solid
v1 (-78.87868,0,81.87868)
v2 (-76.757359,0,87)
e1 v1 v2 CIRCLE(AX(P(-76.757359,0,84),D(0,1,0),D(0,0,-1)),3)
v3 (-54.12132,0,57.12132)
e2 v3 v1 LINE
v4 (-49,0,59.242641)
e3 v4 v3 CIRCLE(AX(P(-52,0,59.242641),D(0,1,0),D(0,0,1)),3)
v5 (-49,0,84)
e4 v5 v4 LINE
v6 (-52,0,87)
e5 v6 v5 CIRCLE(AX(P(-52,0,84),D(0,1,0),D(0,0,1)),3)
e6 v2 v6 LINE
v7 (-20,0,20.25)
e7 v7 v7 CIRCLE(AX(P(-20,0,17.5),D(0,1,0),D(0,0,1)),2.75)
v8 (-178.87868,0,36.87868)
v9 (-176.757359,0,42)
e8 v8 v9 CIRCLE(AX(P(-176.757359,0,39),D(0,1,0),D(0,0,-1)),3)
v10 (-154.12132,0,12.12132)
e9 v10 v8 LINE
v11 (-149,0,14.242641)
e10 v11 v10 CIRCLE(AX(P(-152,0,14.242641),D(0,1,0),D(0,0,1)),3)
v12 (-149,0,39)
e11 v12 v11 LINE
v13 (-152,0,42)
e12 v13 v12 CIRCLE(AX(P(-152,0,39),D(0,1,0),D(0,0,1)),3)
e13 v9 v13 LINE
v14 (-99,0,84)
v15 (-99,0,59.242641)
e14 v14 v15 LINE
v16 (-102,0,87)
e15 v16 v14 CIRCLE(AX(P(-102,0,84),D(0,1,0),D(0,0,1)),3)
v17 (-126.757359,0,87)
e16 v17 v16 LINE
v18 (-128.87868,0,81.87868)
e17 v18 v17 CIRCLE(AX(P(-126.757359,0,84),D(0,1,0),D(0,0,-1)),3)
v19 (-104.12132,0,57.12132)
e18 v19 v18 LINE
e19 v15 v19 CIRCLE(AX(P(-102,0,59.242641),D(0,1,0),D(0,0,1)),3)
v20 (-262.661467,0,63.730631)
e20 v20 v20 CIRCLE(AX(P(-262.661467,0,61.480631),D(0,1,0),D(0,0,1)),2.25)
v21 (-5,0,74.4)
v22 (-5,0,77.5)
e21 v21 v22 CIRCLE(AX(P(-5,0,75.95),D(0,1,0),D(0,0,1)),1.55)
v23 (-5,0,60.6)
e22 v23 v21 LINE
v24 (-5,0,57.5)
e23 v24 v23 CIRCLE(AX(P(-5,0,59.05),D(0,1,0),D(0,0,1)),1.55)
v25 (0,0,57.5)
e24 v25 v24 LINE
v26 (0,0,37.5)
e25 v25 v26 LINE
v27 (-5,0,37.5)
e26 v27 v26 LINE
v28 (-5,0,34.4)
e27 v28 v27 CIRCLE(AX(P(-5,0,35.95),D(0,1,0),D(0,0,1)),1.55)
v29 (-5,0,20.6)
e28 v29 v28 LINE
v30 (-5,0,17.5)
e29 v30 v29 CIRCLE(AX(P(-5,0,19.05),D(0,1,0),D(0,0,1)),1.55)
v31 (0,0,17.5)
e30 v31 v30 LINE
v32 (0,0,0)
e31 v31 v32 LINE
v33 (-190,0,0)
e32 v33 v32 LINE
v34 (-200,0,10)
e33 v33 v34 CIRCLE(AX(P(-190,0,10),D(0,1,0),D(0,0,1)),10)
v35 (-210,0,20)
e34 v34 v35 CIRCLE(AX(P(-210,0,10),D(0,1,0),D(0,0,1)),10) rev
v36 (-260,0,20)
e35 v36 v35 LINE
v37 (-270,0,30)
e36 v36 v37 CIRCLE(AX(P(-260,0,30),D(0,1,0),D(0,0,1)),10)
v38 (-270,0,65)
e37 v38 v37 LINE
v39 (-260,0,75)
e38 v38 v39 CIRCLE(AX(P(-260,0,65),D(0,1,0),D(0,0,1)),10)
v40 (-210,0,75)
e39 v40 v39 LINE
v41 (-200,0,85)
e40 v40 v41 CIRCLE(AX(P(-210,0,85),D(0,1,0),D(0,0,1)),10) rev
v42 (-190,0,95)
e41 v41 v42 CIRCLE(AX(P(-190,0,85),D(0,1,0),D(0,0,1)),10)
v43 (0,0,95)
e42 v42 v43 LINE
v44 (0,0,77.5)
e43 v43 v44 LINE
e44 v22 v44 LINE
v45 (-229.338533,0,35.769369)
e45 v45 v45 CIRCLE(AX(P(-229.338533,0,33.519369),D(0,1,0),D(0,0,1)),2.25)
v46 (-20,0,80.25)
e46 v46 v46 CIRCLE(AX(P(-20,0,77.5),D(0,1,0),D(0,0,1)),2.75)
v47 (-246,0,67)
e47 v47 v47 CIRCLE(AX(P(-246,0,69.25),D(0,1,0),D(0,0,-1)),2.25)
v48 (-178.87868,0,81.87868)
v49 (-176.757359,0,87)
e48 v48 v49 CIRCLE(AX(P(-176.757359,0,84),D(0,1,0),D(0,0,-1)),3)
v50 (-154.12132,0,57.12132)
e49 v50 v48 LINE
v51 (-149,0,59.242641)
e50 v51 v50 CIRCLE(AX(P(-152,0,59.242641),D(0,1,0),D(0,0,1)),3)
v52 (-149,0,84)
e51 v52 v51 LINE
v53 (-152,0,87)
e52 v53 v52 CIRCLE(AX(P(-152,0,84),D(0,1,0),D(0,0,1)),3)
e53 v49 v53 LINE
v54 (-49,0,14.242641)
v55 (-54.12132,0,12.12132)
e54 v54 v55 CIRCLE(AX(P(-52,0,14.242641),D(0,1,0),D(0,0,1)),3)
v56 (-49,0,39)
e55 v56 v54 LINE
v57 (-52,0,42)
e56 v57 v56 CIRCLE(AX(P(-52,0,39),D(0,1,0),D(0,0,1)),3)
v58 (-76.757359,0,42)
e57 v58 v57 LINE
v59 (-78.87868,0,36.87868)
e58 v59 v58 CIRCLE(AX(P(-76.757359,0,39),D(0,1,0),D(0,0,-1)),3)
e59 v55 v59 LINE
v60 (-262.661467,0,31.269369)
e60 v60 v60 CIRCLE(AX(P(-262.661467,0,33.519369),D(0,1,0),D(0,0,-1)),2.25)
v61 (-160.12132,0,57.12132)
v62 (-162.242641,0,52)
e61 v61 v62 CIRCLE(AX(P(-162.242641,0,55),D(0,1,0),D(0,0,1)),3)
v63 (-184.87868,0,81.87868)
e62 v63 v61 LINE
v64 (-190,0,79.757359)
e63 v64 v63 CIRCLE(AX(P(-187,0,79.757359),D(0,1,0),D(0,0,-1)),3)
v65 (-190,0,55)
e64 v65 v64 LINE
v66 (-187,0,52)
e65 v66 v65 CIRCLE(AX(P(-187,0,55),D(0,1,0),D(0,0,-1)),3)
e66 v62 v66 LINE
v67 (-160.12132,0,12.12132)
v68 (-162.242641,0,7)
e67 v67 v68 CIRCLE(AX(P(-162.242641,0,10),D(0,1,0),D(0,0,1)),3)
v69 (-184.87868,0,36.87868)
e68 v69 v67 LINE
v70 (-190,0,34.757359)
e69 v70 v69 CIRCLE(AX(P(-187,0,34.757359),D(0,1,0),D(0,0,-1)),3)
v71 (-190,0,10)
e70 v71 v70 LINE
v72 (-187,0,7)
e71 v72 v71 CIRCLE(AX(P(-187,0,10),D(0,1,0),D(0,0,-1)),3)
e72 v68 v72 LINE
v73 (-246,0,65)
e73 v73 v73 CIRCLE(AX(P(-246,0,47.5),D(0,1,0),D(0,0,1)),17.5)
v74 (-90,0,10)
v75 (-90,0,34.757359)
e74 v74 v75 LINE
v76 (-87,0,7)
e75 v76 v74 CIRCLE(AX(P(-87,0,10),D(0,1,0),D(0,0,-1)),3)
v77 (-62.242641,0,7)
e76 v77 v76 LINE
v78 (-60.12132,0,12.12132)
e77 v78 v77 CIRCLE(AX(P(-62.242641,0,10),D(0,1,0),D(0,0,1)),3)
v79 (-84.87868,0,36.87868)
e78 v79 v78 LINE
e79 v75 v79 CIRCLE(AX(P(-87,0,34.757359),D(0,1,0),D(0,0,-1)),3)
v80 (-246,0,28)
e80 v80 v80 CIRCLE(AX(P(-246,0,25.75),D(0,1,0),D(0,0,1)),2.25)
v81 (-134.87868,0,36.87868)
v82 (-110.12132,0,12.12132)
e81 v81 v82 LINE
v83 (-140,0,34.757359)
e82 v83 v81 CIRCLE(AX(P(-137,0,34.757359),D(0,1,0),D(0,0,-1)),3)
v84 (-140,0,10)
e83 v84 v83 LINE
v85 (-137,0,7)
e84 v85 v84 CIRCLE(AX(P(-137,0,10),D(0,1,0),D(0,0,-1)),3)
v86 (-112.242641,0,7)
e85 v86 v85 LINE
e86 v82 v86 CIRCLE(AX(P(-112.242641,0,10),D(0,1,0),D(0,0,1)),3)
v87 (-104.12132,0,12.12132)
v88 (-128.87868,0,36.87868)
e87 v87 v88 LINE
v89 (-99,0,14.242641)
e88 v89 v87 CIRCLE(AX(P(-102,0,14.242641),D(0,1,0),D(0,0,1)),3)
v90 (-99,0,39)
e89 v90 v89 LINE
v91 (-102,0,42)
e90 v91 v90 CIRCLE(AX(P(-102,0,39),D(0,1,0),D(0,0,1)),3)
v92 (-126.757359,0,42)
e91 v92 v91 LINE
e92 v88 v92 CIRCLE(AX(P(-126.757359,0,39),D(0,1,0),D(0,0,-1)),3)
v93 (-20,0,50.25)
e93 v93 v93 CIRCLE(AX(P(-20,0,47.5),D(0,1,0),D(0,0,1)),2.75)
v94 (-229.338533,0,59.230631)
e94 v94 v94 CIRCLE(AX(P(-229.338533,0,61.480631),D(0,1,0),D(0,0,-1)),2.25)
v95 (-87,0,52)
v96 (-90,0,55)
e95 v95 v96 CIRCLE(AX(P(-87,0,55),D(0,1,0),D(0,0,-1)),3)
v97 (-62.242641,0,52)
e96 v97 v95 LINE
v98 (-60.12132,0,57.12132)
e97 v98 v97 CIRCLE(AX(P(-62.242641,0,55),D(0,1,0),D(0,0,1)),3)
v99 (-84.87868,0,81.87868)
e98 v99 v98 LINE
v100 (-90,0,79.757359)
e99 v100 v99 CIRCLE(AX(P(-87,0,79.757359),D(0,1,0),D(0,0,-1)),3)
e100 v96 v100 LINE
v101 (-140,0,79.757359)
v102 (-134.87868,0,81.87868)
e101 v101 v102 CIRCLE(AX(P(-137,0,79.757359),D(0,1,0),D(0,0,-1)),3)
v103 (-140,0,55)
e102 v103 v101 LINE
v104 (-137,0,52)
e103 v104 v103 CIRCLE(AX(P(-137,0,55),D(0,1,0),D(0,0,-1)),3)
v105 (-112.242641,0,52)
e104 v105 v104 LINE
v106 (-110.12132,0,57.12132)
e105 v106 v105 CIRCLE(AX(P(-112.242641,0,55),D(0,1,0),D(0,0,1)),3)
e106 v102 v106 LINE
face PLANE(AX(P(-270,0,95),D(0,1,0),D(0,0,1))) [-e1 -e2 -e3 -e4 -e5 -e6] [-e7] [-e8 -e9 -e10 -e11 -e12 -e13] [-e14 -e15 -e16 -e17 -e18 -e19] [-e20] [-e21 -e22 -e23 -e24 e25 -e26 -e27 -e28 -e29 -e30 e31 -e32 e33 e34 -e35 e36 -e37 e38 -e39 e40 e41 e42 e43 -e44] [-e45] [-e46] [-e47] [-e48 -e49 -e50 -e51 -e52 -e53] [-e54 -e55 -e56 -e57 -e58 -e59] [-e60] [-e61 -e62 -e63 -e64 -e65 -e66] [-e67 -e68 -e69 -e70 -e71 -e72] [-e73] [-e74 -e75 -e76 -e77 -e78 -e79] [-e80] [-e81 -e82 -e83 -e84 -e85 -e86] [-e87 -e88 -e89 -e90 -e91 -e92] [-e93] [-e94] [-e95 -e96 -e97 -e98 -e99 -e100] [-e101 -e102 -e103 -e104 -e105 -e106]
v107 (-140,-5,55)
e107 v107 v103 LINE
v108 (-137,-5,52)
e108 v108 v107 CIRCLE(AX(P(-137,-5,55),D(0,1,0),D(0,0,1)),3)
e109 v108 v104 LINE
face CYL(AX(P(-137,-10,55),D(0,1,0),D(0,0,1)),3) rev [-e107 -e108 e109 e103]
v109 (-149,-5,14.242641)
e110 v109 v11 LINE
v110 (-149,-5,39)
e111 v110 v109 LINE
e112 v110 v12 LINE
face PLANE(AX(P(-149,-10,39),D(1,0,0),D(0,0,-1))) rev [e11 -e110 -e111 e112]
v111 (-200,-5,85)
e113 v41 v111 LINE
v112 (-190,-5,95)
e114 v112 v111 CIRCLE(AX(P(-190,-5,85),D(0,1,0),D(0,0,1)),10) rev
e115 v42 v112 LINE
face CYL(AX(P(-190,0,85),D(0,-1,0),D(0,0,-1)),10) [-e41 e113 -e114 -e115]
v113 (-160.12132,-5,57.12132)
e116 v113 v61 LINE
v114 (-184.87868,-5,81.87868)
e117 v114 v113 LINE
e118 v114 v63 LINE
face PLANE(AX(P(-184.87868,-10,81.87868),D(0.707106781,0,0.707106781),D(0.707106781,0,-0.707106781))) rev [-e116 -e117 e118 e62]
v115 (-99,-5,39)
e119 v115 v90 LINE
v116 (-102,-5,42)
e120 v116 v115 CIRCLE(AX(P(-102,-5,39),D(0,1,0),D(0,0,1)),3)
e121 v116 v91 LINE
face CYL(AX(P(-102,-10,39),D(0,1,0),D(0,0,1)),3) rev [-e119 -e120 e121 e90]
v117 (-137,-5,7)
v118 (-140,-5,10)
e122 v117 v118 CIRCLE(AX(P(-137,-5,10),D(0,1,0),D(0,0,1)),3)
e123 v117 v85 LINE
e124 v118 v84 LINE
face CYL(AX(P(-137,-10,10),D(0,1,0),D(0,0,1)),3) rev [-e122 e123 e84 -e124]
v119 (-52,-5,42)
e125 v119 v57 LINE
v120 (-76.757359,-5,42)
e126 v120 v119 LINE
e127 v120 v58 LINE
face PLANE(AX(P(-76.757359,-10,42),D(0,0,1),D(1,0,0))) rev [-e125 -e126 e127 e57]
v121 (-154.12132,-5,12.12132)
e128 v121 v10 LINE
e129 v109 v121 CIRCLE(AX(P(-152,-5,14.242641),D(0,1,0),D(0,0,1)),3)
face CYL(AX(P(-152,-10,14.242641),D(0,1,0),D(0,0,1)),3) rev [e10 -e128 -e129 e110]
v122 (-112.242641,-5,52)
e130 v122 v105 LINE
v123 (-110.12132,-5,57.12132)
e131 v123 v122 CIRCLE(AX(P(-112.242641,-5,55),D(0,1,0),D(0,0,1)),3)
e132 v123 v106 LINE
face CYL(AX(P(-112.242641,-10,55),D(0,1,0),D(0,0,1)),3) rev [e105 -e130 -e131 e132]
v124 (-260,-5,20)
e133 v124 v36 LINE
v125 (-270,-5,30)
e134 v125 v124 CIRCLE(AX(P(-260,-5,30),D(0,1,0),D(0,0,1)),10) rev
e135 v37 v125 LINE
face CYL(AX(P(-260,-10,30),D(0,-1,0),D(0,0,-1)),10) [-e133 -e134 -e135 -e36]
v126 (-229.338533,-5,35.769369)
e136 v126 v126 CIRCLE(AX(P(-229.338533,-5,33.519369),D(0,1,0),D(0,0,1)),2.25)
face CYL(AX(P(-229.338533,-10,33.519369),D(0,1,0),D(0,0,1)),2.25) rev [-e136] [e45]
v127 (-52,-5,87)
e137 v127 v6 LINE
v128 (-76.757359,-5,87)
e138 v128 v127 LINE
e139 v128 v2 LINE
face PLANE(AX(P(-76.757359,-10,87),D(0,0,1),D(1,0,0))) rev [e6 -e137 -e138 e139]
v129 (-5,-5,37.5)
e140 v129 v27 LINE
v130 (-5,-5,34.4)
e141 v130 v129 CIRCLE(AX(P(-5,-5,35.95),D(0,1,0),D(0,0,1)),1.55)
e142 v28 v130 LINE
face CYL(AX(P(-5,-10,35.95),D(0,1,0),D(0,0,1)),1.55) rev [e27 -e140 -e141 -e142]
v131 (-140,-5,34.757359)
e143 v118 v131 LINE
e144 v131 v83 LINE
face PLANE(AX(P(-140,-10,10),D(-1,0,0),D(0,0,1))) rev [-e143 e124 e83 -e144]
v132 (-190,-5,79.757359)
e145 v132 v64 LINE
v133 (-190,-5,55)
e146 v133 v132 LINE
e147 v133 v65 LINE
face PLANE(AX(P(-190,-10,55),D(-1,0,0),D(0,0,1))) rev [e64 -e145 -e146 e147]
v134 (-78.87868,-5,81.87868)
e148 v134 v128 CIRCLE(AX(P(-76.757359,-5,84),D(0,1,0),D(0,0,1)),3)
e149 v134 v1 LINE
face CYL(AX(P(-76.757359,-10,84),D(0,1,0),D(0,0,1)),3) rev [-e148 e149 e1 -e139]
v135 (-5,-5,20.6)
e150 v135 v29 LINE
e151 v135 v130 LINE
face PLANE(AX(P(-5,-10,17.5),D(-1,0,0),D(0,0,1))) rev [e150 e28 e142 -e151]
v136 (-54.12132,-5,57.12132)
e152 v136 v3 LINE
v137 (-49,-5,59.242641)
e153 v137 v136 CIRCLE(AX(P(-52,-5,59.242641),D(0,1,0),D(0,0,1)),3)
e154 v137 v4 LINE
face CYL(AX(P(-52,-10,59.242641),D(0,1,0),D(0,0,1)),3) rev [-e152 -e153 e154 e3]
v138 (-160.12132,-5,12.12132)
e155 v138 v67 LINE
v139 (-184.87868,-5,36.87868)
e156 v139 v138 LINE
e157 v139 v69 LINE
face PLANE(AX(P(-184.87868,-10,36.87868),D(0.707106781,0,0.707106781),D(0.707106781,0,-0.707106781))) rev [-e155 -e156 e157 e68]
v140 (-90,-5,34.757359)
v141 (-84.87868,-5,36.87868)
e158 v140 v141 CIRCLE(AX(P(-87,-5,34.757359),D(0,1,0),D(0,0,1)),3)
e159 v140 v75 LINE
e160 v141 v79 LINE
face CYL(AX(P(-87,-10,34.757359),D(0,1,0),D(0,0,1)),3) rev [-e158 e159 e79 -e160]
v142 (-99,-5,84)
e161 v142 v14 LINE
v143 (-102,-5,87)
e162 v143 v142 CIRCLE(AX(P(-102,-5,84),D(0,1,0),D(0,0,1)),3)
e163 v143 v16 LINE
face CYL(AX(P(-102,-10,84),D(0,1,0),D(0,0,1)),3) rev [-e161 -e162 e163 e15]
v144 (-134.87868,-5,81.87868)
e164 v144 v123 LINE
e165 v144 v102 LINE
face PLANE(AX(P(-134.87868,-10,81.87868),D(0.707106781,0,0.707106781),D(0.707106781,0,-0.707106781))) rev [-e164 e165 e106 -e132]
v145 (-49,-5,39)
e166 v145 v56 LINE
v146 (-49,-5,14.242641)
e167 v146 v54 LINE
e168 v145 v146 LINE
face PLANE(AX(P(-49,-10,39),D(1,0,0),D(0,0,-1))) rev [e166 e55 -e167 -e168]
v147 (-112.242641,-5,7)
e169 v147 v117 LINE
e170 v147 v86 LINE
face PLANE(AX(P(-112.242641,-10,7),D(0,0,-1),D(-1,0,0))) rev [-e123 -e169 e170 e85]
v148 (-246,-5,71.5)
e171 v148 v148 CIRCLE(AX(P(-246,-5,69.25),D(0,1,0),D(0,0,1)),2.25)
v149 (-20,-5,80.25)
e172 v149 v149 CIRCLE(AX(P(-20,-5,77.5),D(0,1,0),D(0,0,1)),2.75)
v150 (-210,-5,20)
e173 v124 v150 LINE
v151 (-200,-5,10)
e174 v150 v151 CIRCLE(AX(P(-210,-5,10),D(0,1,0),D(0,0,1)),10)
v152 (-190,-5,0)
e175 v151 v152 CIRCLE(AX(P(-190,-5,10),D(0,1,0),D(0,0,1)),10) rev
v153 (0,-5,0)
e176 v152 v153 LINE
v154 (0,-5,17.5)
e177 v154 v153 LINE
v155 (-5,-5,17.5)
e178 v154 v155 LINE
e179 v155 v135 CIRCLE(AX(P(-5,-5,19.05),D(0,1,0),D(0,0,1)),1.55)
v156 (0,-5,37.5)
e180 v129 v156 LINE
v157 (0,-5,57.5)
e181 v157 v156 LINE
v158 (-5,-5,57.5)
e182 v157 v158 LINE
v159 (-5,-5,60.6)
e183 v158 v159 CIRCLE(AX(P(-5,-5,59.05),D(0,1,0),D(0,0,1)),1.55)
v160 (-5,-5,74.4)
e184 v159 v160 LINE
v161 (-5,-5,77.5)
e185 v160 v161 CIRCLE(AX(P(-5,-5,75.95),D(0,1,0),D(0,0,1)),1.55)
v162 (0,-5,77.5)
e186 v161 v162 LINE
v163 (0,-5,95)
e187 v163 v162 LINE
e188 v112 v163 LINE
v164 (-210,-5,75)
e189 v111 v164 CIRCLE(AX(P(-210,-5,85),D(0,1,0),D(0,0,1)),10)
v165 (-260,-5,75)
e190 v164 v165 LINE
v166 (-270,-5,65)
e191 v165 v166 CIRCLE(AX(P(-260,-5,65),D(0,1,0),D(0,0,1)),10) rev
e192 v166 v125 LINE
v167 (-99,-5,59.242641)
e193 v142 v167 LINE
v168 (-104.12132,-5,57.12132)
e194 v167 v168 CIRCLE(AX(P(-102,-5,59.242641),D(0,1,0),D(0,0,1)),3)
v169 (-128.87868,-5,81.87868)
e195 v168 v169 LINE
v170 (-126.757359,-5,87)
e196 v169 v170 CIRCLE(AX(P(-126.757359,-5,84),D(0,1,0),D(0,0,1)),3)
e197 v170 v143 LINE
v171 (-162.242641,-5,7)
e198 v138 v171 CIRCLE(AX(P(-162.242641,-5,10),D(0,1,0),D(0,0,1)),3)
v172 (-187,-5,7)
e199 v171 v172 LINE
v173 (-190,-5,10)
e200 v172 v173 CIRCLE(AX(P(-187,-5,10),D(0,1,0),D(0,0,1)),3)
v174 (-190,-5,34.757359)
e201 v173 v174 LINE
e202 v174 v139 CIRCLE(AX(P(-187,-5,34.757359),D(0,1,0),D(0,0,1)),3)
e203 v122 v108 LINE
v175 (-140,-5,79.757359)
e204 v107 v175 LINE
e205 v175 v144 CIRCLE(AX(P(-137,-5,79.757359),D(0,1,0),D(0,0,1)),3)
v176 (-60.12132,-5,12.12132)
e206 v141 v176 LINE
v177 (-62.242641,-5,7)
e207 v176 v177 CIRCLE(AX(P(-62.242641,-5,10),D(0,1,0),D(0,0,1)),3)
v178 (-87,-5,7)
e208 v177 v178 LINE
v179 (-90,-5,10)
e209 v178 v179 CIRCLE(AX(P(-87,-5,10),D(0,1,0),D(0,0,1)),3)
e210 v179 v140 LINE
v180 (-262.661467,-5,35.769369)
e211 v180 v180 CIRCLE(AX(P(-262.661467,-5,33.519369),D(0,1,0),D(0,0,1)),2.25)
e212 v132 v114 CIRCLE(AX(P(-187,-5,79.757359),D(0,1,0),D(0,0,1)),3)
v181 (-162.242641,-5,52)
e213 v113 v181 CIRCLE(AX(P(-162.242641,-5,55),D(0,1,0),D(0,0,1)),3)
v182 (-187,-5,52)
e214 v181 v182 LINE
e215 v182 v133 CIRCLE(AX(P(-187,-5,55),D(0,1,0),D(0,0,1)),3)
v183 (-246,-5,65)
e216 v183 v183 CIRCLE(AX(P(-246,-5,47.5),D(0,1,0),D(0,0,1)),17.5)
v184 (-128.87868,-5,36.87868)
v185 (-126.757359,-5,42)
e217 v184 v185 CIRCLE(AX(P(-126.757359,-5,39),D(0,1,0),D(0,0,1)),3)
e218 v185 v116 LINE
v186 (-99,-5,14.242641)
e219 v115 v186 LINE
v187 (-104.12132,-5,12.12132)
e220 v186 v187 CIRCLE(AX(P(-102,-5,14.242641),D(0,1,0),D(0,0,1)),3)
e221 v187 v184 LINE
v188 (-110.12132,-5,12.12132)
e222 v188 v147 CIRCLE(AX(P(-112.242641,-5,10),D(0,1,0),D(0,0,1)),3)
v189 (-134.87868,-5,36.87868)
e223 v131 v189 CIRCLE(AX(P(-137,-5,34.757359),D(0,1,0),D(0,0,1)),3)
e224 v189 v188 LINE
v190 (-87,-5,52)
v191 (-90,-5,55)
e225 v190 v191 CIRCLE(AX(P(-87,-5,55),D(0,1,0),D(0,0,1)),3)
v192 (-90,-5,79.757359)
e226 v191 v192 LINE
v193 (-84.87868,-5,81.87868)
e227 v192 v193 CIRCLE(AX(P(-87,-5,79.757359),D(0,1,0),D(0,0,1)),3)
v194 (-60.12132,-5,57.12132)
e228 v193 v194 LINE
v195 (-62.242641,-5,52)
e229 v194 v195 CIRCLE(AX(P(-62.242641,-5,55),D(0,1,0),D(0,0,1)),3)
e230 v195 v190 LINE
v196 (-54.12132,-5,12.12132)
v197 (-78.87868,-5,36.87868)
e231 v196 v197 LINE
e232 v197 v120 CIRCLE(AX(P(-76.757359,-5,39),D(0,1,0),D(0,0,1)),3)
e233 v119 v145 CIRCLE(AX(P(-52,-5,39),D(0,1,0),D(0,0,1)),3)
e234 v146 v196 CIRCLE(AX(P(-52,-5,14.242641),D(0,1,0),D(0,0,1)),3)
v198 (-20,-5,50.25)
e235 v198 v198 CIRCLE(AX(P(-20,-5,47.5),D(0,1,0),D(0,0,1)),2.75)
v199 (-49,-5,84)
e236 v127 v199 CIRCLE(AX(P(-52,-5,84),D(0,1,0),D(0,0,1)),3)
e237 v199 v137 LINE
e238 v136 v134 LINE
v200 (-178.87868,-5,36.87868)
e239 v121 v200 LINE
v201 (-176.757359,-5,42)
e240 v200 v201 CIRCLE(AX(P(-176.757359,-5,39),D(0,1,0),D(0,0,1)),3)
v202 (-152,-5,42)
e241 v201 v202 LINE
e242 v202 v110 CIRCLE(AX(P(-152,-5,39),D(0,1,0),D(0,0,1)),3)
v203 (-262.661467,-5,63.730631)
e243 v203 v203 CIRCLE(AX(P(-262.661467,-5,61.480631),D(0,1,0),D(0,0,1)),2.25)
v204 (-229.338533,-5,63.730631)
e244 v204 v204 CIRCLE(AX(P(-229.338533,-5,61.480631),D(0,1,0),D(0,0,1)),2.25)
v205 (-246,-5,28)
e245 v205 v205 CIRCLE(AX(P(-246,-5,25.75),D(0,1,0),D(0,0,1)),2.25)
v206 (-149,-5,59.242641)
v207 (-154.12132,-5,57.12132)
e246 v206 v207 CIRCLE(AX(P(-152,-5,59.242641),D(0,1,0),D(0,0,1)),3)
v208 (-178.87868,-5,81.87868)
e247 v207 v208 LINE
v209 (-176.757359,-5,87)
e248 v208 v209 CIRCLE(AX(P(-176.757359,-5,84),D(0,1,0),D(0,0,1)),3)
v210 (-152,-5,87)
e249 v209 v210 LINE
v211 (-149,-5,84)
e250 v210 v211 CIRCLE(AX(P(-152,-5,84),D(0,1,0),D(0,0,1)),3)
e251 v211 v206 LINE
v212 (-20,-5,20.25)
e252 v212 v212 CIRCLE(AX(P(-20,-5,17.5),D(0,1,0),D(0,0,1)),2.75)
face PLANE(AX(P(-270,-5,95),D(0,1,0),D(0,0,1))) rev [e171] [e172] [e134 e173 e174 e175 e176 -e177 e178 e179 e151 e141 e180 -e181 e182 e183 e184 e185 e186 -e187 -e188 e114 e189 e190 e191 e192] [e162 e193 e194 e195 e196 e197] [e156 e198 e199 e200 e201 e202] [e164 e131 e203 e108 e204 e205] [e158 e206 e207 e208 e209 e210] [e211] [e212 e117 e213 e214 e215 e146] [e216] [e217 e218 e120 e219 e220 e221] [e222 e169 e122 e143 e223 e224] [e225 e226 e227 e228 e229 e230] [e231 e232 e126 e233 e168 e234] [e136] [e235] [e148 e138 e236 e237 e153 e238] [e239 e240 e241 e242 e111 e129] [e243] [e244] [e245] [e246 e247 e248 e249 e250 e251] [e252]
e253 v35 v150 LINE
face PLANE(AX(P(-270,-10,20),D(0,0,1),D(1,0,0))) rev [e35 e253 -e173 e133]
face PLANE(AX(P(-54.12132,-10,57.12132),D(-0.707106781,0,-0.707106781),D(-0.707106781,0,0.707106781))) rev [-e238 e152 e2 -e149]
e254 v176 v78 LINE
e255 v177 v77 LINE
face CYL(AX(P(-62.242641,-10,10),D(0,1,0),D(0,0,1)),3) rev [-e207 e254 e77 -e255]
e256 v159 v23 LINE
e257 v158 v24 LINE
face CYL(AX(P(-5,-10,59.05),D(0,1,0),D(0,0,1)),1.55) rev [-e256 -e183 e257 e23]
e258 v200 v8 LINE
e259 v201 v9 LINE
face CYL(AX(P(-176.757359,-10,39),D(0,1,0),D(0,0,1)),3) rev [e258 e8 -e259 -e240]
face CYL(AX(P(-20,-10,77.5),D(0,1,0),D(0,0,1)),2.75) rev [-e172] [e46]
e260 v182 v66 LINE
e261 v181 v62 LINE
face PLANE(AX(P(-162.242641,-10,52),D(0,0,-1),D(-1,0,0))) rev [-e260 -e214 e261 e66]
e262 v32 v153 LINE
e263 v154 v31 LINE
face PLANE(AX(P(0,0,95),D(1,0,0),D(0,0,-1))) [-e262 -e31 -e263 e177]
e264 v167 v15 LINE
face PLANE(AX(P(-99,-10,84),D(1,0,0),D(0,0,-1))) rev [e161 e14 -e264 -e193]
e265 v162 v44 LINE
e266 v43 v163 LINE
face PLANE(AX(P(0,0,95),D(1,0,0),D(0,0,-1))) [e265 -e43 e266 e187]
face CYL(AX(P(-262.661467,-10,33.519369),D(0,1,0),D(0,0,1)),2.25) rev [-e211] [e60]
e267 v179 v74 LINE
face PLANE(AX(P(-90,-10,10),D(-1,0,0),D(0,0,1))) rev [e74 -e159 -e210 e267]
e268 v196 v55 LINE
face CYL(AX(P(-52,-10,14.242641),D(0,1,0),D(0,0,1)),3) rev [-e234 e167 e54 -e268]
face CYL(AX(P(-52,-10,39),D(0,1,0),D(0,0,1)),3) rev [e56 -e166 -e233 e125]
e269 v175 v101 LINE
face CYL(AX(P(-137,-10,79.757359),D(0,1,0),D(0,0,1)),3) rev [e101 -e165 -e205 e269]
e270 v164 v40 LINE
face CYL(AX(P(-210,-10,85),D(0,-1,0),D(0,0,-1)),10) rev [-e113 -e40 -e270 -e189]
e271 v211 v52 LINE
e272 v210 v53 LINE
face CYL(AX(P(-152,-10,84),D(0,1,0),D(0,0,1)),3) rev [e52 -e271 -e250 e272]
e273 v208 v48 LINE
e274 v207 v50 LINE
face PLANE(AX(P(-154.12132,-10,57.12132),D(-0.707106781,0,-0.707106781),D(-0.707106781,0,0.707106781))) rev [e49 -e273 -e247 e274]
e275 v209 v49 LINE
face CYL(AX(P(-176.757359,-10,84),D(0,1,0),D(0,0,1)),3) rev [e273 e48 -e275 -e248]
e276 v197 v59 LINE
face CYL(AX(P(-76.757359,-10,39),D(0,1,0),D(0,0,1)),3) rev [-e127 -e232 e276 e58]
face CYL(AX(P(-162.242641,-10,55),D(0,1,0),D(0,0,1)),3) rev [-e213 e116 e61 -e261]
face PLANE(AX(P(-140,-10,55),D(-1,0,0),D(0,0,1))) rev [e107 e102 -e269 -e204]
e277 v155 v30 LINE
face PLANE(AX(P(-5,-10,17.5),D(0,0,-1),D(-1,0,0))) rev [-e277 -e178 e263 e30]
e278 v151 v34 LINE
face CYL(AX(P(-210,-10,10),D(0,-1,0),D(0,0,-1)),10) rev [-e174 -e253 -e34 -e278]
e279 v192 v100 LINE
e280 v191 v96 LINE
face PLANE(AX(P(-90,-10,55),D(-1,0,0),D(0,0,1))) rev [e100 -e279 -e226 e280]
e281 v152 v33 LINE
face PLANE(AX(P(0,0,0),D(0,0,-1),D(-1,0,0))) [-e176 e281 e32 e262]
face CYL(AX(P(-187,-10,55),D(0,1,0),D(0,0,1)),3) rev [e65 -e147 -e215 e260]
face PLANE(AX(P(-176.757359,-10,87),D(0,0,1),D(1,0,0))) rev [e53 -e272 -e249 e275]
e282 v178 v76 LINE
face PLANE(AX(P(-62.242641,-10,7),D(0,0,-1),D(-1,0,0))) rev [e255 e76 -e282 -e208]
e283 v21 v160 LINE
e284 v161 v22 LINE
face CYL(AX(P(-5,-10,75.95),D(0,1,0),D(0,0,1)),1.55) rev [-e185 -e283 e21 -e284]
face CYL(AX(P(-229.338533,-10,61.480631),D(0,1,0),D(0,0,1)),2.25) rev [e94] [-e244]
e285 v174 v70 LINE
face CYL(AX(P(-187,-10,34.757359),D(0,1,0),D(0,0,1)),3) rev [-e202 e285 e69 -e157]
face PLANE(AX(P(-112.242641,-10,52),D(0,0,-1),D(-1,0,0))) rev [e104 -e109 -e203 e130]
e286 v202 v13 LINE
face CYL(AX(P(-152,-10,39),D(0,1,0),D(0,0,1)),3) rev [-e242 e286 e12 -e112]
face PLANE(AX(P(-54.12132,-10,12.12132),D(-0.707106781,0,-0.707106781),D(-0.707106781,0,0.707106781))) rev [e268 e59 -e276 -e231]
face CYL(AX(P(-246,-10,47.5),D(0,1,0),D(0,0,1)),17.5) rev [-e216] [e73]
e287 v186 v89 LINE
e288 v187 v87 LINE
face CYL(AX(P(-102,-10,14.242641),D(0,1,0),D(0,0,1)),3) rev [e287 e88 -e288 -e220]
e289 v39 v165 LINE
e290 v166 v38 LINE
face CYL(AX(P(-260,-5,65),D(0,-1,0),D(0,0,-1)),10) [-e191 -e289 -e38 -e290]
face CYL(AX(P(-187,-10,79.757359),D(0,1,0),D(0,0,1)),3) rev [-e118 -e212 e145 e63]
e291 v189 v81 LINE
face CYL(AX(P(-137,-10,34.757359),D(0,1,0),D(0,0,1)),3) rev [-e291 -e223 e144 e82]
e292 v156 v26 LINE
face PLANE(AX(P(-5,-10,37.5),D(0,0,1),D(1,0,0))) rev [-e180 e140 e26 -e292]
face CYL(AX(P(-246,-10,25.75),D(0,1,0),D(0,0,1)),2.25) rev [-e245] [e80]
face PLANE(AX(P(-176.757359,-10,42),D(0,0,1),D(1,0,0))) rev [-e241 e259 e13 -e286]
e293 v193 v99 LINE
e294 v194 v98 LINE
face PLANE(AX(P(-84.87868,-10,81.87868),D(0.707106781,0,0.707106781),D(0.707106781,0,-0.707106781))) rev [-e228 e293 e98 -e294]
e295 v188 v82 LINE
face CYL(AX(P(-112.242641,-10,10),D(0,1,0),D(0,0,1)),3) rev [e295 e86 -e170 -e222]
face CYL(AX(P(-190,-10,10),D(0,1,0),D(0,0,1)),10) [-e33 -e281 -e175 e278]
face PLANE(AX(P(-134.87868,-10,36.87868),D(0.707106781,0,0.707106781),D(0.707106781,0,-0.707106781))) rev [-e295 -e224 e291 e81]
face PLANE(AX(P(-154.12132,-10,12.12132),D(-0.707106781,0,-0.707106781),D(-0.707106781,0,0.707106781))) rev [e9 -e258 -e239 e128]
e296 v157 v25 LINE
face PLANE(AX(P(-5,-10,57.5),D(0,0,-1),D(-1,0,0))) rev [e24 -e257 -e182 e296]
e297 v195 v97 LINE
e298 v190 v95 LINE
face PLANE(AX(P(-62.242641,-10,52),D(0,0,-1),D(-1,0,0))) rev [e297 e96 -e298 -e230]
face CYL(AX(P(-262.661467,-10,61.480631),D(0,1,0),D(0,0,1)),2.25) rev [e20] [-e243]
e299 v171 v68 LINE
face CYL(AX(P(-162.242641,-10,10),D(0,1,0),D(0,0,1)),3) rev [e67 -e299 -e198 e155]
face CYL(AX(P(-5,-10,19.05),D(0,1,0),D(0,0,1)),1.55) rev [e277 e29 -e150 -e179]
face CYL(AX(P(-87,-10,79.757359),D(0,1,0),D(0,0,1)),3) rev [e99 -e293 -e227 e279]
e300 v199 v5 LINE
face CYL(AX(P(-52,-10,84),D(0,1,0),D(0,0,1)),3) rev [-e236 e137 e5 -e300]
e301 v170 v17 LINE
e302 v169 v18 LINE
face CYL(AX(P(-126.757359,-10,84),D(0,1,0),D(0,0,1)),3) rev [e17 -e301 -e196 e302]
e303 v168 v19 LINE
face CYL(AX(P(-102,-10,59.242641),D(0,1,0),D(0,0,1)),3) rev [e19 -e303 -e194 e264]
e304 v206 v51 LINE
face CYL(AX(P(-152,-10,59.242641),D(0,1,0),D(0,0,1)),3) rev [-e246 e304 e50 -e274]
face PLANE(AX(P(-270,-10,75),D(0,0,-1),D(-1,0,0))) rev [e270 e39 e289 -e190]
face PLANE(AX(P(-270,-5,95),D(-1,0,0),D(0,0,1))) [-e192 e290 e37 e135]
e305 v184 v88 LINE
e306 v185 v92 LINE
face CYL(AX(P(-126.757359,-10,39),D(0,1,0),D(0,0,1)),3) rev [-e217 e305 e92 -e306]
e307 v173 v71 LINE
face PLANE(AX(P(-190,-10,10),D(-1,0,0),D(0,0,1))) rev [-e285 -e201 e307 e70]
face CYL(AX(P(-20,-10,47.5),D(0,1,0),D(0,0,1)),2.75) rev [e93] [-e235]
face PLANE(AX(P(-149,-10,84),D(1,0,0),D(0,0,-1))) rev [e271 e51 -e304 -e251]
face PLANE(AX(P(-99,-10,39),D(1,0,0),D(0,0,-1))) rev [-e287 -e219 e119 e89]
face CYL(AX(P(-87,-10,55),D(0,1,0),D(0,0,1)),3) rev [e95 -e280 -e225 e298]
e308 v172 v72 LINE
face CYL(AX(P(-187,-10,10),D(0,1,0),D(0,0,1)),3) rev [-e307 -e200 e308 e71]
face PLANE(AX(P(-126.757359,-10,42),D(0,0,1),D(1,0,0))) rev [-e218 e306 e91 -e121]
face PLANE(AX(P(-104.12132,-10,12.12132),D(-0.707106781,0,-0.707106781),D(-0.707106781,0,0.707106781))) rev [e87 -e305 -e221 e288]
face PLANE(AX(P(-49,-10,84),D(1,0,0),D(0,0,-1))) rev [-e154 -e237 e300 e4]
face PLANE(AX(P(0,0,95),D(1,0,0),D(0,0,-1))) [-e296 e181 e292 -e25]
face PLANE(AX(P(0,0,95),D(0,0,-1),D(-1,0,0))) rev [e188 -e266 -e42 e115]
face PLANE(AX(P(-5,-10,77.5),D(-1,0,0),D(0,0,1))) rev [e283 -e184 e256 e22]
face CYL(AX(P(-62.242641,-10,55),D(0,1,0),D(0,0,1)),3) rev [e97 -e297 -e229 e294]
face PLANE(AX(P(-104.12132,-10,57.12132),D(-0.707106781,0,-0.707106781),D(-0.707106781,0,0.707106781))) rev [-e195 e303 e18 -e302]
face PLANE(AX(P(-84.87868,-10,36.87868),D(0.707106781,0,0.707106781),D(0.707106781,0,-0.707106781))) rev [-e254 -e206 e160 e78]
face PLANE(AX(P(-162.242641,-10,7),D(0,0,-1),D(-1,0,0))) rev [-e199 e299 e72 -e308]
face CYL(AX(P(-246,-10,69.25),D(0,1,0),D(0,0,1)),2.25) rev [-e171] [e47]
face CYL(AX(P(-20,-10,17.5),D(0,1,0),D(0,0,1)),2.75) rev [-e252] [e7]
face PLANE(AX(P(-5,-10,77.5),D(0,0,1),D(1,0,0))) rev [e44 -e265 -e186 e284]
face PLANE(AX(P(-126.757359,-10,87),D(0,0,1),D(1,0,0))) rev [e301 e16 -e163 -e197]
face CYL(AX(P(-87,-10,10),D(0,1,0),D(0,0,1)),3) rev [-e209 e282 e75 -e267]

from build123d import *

# Parameters (mm, degrees)
SKETCH_1_W          = 270
SKETCH_1_H          = 5
EXTRUDE_1_DEPTH     = 95
SKETCH_2_R          = 2.25
SKETCH_2_R_2        = 17.5
CUT_EXTRUDE_1_DEPTH = 10
SKETCH_3_W          = 70
SKETCH_3_H          = 20
CUT_EXTRUDE_2_DEPTH = 10
FILLET_1_R          = 10
SKETCH_4_R          = 2.75
SKETCH_4_W          = 5
SKETCH_4_H          = 20
CUT_EXTRUDE_3_DEPTH = 10
SKETCH_5_R          = 1.55
CUT_EXTRUDE_4_DEPTH = 10


with BuildPart() as part:
    # 草图1 → 拉伸-薄壁1 (new body)
    with BuildSketch(Plane.XY):
        with Locations((-135, -2.5)):
            Rectangle(SKETCH_1_W, SKETCH_1_H)
    extrude(amount=EXTRUDE_1_DEPTH)

    # 草图2 → 切除-拉伸1 (cut)
    with BuildSketch(Plane(origin=(0, 0, 0), x_dir=(1, 0, 0), z_dir=(0, 1, 0))):
        with Locations(Location((-246, -25.75, 0), (0, 0, 270))):
            Circle(SKETCH_2_R)
        with Locations(Location((-229.338533362, -33.519369489, 0), (0, 0, 270))):
            Circle(SKETCH_2_R)
        with Locations(Location((-262.661466638, -33.519369489, 0), (0, 0, 270))):
            Circle(SKETCH_2_R)
        with Locations(Location((-262.661466638, -61.480630511, 0), (0, 0, 270))):
            Circle(SKETCH_2_R)
        with Locations(Location((-246, -69.25, 0), (0, 0, 270))):
            Circle(SKETCH_2_R)
        with Locations(Location((-229.338533362, -61.480630511, 0), (0, 0, 270))):
            Circle(SKETCH_2_R)
        with Locations(Location((-246, -47.5, 0), (0, 0, 270))):
            Circle(SKETCH_2_R_2)
    extrude(amount=-CUT_EXTRUDE_1_DEPTH, mode=Mode.SUBTRACT)

    # 草图3 → 切除-拉伸2 (cut)
    with BuildSketch(Plane(origin=(0, 0, 0), x_dir=(1, 0, 0), z_dir=(0, 1, 0))):
        with Locations((-235, -85)):
            Rectangle(SKETCH_3_W, SKETCH_3_H)
        with Locations((-235, -10)):
            Rectangle(SKETCH_3_W, SKETCH_3_H)
        with BuildLine():
            Line((-190, -10), (-190, -34.757359313))
            ThreePointArc((-190, -34.757359313), (-188.148050297, -37.52899791), (-184.878679656, -36.878679656))
            Line((-184.878679656, -36.878679656), (-160.121320344, -12.121320344))
            ThreePointArc((-160.121320344, -12.121320344), (-159.47100209, -8.851949703), (-162.242640687, -7))
            Line((-162.242640687, -7), (-187, -7))
            ThreePointArc((-187, -7), (-189.121320344, -7.878679656), (-190, -10))
        make_face()
        with BuildLine():
            Line((-154.121320344, -12.121320344), (-178.878679656, -36.878679656))
            ThreePointArc((-178.878679656, -36.878679656), (-179.52899791, -40.148050297), (-176.757359313, -42))
            Line((-176.757359313, -42), (-152, -42))
            ThreePointArc((-152, -42), (-149.878679656, -41.121320344), (-149, -39))
            Line((-149, -39), (-149, -14.242640687))
            ThreePointArc((-149, -14.242640687), (-150.851949703, -11.47100209), (-154.121320344, -12.121320344))
        make_face()
        with BuildLine():
            Line((-112.242640687, -7), (-137, -7))
            ThreePointArc((-137, -7), (-139.121320344, -7.878679656), (-140, -10))
            Line((-140, -10), (-140, -34.757359313))
            ThreePointArc((-140, -34.757359313), (-138.148050297, -37.52899791), (-134.878679656, -36.878679656))
            Line((-134.878679656, -36.878679656), (-110.121320344, -12.121320344))
            ThreePointArc((-110.121320344, -12.121320344), (-109.47100209, -8.851949703), (-112.242640687, -7))
        make_face()
        with BuildLine():
            Line((-99, -39), (-99, -14.242640687))
            ThreePointArc((-99, -14.242640687), (-100.851949703, -11.47100209), (-104.121320344, -12.121320344))
            Line((-104.121320344, -12.121320344), (-128.878679656, -36.878679656))
            ThreePointArc((-128.878679656, -36.878679656), (-129.52899791, -40.148050297), (-126.757359313, -42))
            Line((-126.757359313, -42), (-102, -42))
            ThreePointArc((-102, -42), (-99.878679656, -41.121320344), (-99, -39))
        make_face()
        with BuildLine():
            Line((-112.242640687, -52), (-137, -52))
            ThreePointArc((-137, -52), (-139.121320344, -52.878679656), (-140, -55))
            Line((-140, -55), (-140, -79.757359313))
            ThreePointArc((-140, -79.757359313), (-138.148050297, -82.52899791), (-134.878679656, -81.878679656))
            Line((-134.878679656, -81.878679656), (-110.121320344, -57.121320344))
            ThreePointArc((-110.121320344, -57.121320344), (-109.47100209, -53.851949703), (-112.242640687, -52))
        make_face()
        with BuildLine():
            Line((-99, -84), (-99, -59.242640687))
            ThreePointArc((-99, -59.242640687), (-100.851949703, -56.47100209), (-104.121320344, -57.121320344))
            Line((-104.121320344, -57.121320344), (-128.878679656, -81.878679656))
            ThreePointArc((-128.878679656, -81.878679656), (-129.52899791, -85.148050297), (-126.757359313, -87))
            Line((-126.757359313, -87), (-102, -87))
            ThreePointArc((-102, -87), (-99.878679656, -86.121320344), (-99, -84))
        make_face()
        with BuildLine():
            Line((-162.242640687, -52), (-187, -52))
            ThreePointArc((-187, -52), (-189.121320344, -52.878679656), (-190, -55))
            Line((-190, -55), (-190, -79.757359313))
            ThreePointArc((-190, -79.757359313), (-188.148050297, -82.52899791), (-184.878679656, -81.878679656))
            Line((-184.878679656, -81.878679656), (-160.121320344, -57.121320344))
            ThreePointArc((-160.121320344, -57.121320344), (-159.47100209, -53.851949703), (-162.242640687, -52))
        make_face()
        with BuildLine():
            Line((-149, -84), (-149, -59.242640687))
            ThreePointArc((-149, -59.242640687), (-150.851949703, -56.47100209), (-154.121320344, -57.121320344))
            Line((-154.121320344, -57.121320344), (-178.878679656, -81.878679656))
            ThreePointArc((-178.878679656, -81.878679656), (-179.52899791, -85.148050297), (-176.757359313, -87))
            Line((-176.757359313, -87), (-152, -87))
            ThreePointArc((-152, -87), (-149.878679656, -86.121320344), (-149, -84))
        make_face()
        with BuildLine():
            Line((-62.242640687, -7), (-87, -7))
            ThreePointArc((-87, -7), (-89.121320344, -7.878679656), (-90, -10))
            Line((-90, -10), (-90, -34.757359313))
            ThreePointArc((-90, -34.757359313), (-88.148050297, -37.52899791), (-84.878679656, -36.878679656))
            Line((-84.878679656, -36.878679656), (-60.121320344, -12.121320344))
            ThreePointArc((-60.121320344, -12.121320344), (-59.47100209, -8.851949703), (-62.242640687, -7))
        make_face()
        with BuildLine():
            Line((-49, -39), (-49, -14.242640687))
            ThreePointArc((-49, -14.242640687), (-50.851949703, -11.47100209), (-54.121320344, -12.121320344))
            Line((-54.121320344, -12.121320344), (-78.878679656, -36.878679656))
            ThreePointArc((-78.878679656, -36.878679656), (-79.52899791, -40.148050297), (-76.757359313, -42))
            Line((-76.757359313, -42), (-52, -42))
            ThreePointArc((-52, -42), (-49.878679656, -41.121320344), (-49, -39))
        make_face()
        with BuildLine():
            Line((-62.242640687, -52), (-87, -52))
            ThreePointArc((-87, -52), (-89.121320344, -52.878679656), (-90, -55))
            Line((-90, -55), (-90, -79.757359313))
            ThreePointArc((-90, -79.757359313), (-88.148050297, -82.52899791), (-84.878679656, -81.878679656))
            Line((-84.878679656, -81.878679656), (-60.121320344, -57.121320344))
            ThreePointArc((-60.121320344, -57.121320344), (-59.47100209, -53.851949703), (-62.242640687, -52))
        make_face()
        with BuildLine():
            Line((-49, -84), (-49, -59.242640687))
            ThreePointArc((-49, -59.242640687), (-50.851949703, -56.47100209), (-54.121320344, -57.121320344))
            Line((-54.121320344, -57.121320344), (-78.878679656, -81.878679656))
            ThreePointArc((-78.878679656, -81.878679656), (-79.52899791, -85.148050297), (-76.757359313, -87))
            Line((-76.757359313, -87), (-52, -87))
            ThreePointArc((-52, -87), (-49.878679656, -86.121320344), (-49, -84))
        make_face()
    extrude(amount=-CUT_EXTRUDE_2_DEPTH, mode=Mode.SUBTRACT)

    # 圆角1
    fillet_1_edges = [part.edges().sort_by_distance(p)[0] for p in [
        (-200, -2.5, 95),
        (-200, -2.5, 0),
        (-200, -2.5, 20),
        (-200, -2.5, 75),
        (-270, -2.5, 75),
        (-270, -2.5, 20),
    ]]
    fillet(fillet_1_edges, radius=FILLET_1_R - 0.0001)  # a hair under: the kernel refuses the full size

    # 草图4 → 切除-拉伸3 (cut)
    with BuildSketch(Plane(origin=(0, 0, 0), x_dir=(1, 0, 0), z_dir=(0, 1, 0))):
        with Locations(Location((-20, -17.5, 0), (0, 0, 270))):
            Circle(SKETCH_4_R)
        with Locations(Location((-20, -47.5, 0), (0, 0, 270))):
            Circle(SKETCH_4_R)
        with Locations(Location((-20, -77.5, 0), (0, 0, 270))):
            Circle(SKETCH_4_R)
        with Locations((-2.5, -67.5)):
            Rectangle(SKETCH_4_W, SKETCH_4_H)
        with Locations((-2.5, -27.5)):
            Rectangle(SKETCH_4_W, SKETCH_4_H)
    extrude(amount=-CUT_EXTRUDE_3_DEPTH, mode=Mode.SUBTRACT)

    # 草图5 → 切除-拉伸4 (cut)
    with BuildSketch(Plane(origin=(0, 0, 0), x_dir=(1, 0, 0), z_dir=(0, 1, 0))):
        with Locations((-5, -19.05)):
            Circle(SKETCH_5_R)
        with Locations((-5, -35.95)):
            Circle(SKETCH_5_R)
        with Locations((-5, -59.05)):
            Circle(SKETCH_5_R)
        with Locations((-5, -75.95)):
            Circle(SKETCH_5_R)
    extrude(amount=-CUT_EXTRUDE_4_DEPTH, mode=Mode.SUBTRACT)


solid = part.part
